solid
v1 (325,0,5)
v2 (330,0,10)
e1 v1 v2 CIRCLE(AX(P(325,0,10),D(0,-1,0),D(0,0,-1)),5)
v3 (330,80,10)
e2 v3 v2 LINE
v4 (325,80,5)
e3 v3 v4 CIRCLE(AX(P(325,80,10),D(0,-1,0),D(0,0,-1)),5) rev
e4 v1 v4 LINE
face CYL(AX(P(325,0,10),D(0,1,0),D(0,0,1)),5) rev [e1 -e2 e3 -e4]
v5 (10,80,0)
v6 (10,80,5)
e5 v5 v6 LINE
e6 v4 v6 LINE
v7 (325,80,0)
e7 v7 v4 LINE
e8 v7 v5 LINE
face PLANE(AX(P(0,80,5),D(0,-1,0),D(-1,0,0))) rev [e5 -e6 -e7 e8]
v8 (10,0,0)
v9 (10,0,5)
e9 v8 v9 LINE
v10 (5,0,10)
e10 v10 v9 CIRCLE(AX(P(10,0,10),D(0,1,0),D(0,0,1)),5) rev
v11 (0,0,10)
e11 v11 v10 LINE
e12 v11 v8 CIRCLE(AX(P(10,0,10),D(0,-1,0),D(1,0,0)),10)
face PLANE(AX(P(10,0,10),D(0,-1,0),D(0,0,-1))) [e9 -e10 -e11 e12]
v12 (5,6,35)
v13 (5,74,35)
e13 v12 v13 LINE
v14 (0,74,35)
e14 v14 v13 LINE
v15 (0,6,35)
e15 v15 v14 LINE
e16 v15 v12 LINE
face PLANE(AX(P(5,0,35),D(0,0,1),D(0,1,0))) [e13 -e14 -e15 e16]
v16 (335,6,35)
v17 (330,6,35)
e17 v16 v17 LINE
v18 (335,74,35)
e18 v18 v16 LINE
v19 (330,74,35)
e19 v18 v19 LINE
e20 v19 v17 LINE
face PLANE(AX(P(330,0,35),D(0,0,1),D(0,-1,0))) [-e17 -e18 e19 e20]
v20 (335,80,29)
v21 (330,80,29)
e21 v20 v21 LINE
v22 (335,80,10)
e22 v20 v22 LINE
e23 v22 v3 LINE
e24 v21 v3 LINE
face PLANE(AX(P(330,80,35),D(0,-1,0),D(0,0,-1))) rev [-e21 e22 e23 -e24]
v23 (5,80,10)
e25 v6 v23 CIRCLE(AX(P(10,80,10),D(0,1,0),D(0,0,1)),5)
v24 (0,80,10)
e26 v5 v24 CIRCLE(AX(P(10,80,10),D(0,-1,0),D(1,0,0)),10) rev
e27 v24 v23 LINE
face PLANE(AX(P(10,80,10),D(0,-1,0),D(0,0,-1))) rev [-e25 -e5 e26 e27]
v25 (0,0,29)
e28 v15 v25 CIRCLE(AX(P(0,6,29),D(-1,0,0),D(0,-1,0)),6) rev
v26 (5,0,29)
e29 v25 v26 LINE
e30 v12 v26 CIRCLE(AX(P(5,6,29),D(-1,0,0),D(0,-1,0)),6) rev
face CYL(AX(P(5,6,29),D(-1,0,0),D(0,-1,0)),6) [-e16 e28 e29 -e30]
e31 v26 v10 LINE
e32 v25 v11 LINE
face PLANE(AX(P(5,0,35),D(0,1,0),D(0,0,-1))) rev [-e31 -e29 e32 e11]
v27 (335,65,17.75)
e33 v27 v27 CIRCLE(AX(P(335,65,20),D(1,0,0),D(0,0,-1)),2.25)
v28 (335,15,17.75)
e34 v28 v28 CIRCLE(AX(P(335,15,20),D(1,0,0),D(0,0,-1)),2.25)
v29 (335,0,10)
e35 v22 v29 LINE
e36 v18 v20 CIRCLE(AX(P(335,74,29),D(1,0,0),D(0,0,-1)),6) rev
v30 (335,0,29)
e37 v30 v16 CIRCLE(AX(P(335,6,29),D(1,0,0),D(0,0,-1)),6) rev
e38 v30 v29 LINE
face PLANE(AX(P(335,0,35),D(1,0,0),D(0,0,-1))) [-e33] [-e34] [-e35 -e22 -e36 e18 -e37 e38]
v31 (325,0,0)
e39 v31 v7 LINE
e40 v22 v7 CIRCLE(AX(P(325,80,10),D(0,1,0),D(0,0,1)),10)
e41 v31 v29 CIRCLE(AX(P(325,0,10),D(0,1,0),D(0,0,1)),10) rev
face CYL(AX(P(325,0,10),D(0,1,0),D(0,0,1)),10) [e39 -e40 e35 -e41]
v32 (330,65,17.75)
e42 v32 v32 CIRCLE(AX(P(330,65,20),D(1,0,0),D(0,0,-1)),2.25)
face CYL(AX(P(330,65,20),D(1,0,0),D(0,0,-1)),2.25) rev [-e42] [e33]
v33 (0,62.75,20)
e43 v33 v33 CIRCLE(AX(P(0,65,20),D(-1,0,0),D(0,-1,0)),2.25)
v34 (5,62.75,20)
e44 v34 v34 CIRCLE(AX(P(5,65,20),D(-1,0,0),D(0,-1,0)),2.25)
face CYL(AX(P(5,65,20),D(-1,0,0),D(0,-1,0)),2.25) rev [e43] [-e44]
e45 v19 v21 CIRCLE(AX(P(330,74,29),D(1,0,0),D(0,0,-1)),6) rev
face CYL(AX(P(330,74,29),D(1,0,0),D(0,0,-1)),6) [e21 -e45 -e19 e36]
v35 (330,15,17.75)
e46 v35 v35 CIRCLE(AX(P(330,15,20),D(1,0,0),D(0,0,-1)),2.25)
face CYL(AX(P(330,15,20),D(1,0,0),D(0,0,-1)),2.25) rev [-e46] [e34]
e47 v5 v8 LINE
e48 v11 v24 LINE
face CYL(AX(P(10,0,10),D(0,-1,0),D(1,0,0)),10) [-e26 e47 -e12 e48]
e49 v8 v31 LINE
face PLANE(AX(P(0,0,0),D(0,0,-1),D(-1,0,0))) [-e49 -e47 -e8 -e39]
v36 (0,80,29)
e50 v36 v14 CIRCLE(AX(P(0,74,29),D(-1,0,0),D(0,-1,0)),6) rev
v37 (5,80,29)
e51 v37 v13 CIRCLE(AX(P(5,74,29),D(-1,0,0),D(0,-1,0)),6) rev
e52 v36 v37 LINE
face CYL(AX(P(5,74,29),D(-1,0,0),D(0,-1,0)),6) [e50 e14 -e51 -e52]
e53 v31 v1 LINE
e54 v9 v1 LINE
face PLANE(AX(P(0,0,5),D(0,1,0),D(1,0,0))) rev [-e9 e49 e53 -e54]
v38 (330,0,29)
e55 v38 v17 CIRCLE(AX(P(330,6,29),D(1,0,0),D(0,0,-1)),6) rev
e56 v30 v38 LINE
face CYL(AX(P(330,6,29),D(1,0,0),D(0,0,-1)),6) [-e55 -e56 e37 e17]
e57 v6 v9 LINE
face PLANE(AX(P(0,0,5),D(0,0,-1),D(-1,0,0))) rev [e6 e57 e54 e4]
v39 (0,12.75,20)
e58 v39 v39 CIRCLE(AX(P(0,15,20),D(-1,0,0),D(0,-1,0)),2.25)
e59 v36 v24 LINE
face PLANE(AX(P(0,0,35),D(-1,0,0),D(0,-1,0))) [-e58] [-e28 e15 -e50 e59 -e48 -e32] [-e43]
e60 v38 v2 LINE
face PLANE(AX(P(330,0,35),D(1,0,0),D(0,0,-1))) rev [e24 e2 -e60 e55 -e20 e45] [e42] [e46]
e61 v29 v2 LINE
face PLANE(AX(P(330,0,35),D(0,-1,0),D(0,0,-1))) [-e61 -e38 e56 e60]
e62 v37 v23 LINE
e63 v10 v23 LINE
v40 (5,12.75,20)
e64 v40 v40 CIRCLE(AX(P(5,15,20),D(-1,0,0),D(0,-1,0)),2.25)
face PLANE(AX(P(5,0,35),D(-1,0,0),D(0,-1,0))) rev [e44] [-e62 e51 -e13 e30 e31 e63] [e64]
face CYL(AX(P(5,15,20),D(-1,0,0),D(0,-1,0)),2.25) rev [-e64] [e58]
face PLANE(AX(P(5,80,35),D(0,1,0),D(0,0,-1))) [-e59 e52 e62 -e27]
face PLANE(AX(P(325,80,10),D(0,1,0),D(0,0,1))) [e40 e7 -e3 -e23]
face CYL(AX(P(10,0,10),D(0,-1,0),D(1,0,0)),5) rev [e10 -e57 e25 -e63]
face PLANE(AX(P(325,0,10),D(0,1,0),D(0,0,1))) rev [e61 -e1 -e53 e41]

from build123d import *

# Parameters (mm, degrees)
ESQUISSE1_W                  = 335
ESQUISSE1_H                  = 80
BOSS_EXTRU_1_DEPTH           = 5
ESQUISSE2_W                  = 5
ESQUISSE2_H                  = 80
BOSS_EXTRU_2_DEPTH           = 30
ENL_V_MAT_EXTRU_1_DEPTH      = 347.193587462
ENL_V_MAT_EXTRU_1_DEPTH_BACK = 347.193587462
ESQUISSE3_R                  = 2.25
CONG_1_R                     = 6
CONVERTIR_VOLUME2_DEPTH      = 80
CONVERTIR_VOLUME2_2_DEPTH    = 80


# Read off the part's stored shape, not the designer's step: Convertir-Volume2
with BuildPart() as part:
    # Esquisse1 → Boss.-Extru.1 (new body)
    with BuildSketch(Plane.XY):
        with Locations((167.5, 40)):
            Rectangle(ESQUISSE1_W, ESQUISSE1_H)
    extrude(amount=BOSS_EXTRU_1_DEPTH)

    # Esquisse2 → Boss.-Extru.2 (add)
    with BuildSketch(Plane.XY.offset(5)):
        with Locations((2.5, 40)):
            Rectangle(ESQUISSE2_W, ESQUISSE2_H)
        with Locations((332.5, 40)):
            Rectangle(ESQUISSE2_W, ESQUISSE2_H)
    extrude(amount=BOSS_EXTRU_2_DEPTH)

    # Esquisse3 → Enlèv. mat.-Extru.1 (cut, two sides: drawn at the far end of the back side and taken through both)
    with BuildSketch(Plane.ZY.offset(-ENL_V_MAT_EXTRU_1_DEPTH_BACK)):
        with Locations((20, 15)):
            Circle(ESQUISSE3_R)
        with Locations(Location((20, 65, 0), (0, 0, 180))):
            Circle(ESQUISSE3_R)
    extrude(amount=ENL_V_MAT_EXTRU_1_DEPTH + ENL_V_MAT_EXTRU_1_DEPTH_BACK, mode=Mode.SUBTRACT)

    # Congé1
    cong_1_edges = [part.edges().sort_by_distance(p)[0] for p in [
        (2.5, 0, 35),
        (2.5, 80, 35),
        (332.5, 0, 35),
        (332.5, 80, 35),
    ]]
    fillet(cong_1_edges, radius=CONG_1_R)

    # Convertir-Volume2 outline → Convertir-Volume2 (cut)
    with BuildSketch(Plane(origin=(0, 0, 0), x_dir=(1, 0, 0), z_dir=(0, 1, 0))):
        with BuildLine():
            ThreePointArc((0, -10), (2.928932188, -2.928932188), (10, 0))
            Line((10, 0), (0, 0))
            Line((0, 0), (0, -10))
        make_face()
        with BuildLine():
            ThreePointArc((325, 0), (332.071067812, -2.928932188), (335, -10))
            Line((335, -10), (335, 0))
            Line((335, 0), (325, 0))
        make_face()
    extrude(amount=CONVERTIR_VOLUME2_DEPTH, mode=Mode.SUBTRACT)

    # Convertir-Volume2 2 outline → Convertir-Volume2 2 (add)
    with BuildSketch(Plane(origin=(0, 0, 0), x_dir=(1, 0, 0), z_dir=(0, 1, 0))):
        with BuildLine():
            ThreePointArc((5, -10), (6.464466094, -6.464466094), (10, -5))
            Line((10, -5), (5, -5))
            Line((5, -5), (5, -10))
        make_face()
        with BuildLine():
            ThreePointArc((325, -5), (328.535533906, -6.464466094), (330, -10))
            Line((330, -10), (330, -5))
            Line((330, -5), (325, -5))
        make_face()
    extrude(amount=CONVERTIR_VOLUME2_2_DEPTH)


solid = part.part
